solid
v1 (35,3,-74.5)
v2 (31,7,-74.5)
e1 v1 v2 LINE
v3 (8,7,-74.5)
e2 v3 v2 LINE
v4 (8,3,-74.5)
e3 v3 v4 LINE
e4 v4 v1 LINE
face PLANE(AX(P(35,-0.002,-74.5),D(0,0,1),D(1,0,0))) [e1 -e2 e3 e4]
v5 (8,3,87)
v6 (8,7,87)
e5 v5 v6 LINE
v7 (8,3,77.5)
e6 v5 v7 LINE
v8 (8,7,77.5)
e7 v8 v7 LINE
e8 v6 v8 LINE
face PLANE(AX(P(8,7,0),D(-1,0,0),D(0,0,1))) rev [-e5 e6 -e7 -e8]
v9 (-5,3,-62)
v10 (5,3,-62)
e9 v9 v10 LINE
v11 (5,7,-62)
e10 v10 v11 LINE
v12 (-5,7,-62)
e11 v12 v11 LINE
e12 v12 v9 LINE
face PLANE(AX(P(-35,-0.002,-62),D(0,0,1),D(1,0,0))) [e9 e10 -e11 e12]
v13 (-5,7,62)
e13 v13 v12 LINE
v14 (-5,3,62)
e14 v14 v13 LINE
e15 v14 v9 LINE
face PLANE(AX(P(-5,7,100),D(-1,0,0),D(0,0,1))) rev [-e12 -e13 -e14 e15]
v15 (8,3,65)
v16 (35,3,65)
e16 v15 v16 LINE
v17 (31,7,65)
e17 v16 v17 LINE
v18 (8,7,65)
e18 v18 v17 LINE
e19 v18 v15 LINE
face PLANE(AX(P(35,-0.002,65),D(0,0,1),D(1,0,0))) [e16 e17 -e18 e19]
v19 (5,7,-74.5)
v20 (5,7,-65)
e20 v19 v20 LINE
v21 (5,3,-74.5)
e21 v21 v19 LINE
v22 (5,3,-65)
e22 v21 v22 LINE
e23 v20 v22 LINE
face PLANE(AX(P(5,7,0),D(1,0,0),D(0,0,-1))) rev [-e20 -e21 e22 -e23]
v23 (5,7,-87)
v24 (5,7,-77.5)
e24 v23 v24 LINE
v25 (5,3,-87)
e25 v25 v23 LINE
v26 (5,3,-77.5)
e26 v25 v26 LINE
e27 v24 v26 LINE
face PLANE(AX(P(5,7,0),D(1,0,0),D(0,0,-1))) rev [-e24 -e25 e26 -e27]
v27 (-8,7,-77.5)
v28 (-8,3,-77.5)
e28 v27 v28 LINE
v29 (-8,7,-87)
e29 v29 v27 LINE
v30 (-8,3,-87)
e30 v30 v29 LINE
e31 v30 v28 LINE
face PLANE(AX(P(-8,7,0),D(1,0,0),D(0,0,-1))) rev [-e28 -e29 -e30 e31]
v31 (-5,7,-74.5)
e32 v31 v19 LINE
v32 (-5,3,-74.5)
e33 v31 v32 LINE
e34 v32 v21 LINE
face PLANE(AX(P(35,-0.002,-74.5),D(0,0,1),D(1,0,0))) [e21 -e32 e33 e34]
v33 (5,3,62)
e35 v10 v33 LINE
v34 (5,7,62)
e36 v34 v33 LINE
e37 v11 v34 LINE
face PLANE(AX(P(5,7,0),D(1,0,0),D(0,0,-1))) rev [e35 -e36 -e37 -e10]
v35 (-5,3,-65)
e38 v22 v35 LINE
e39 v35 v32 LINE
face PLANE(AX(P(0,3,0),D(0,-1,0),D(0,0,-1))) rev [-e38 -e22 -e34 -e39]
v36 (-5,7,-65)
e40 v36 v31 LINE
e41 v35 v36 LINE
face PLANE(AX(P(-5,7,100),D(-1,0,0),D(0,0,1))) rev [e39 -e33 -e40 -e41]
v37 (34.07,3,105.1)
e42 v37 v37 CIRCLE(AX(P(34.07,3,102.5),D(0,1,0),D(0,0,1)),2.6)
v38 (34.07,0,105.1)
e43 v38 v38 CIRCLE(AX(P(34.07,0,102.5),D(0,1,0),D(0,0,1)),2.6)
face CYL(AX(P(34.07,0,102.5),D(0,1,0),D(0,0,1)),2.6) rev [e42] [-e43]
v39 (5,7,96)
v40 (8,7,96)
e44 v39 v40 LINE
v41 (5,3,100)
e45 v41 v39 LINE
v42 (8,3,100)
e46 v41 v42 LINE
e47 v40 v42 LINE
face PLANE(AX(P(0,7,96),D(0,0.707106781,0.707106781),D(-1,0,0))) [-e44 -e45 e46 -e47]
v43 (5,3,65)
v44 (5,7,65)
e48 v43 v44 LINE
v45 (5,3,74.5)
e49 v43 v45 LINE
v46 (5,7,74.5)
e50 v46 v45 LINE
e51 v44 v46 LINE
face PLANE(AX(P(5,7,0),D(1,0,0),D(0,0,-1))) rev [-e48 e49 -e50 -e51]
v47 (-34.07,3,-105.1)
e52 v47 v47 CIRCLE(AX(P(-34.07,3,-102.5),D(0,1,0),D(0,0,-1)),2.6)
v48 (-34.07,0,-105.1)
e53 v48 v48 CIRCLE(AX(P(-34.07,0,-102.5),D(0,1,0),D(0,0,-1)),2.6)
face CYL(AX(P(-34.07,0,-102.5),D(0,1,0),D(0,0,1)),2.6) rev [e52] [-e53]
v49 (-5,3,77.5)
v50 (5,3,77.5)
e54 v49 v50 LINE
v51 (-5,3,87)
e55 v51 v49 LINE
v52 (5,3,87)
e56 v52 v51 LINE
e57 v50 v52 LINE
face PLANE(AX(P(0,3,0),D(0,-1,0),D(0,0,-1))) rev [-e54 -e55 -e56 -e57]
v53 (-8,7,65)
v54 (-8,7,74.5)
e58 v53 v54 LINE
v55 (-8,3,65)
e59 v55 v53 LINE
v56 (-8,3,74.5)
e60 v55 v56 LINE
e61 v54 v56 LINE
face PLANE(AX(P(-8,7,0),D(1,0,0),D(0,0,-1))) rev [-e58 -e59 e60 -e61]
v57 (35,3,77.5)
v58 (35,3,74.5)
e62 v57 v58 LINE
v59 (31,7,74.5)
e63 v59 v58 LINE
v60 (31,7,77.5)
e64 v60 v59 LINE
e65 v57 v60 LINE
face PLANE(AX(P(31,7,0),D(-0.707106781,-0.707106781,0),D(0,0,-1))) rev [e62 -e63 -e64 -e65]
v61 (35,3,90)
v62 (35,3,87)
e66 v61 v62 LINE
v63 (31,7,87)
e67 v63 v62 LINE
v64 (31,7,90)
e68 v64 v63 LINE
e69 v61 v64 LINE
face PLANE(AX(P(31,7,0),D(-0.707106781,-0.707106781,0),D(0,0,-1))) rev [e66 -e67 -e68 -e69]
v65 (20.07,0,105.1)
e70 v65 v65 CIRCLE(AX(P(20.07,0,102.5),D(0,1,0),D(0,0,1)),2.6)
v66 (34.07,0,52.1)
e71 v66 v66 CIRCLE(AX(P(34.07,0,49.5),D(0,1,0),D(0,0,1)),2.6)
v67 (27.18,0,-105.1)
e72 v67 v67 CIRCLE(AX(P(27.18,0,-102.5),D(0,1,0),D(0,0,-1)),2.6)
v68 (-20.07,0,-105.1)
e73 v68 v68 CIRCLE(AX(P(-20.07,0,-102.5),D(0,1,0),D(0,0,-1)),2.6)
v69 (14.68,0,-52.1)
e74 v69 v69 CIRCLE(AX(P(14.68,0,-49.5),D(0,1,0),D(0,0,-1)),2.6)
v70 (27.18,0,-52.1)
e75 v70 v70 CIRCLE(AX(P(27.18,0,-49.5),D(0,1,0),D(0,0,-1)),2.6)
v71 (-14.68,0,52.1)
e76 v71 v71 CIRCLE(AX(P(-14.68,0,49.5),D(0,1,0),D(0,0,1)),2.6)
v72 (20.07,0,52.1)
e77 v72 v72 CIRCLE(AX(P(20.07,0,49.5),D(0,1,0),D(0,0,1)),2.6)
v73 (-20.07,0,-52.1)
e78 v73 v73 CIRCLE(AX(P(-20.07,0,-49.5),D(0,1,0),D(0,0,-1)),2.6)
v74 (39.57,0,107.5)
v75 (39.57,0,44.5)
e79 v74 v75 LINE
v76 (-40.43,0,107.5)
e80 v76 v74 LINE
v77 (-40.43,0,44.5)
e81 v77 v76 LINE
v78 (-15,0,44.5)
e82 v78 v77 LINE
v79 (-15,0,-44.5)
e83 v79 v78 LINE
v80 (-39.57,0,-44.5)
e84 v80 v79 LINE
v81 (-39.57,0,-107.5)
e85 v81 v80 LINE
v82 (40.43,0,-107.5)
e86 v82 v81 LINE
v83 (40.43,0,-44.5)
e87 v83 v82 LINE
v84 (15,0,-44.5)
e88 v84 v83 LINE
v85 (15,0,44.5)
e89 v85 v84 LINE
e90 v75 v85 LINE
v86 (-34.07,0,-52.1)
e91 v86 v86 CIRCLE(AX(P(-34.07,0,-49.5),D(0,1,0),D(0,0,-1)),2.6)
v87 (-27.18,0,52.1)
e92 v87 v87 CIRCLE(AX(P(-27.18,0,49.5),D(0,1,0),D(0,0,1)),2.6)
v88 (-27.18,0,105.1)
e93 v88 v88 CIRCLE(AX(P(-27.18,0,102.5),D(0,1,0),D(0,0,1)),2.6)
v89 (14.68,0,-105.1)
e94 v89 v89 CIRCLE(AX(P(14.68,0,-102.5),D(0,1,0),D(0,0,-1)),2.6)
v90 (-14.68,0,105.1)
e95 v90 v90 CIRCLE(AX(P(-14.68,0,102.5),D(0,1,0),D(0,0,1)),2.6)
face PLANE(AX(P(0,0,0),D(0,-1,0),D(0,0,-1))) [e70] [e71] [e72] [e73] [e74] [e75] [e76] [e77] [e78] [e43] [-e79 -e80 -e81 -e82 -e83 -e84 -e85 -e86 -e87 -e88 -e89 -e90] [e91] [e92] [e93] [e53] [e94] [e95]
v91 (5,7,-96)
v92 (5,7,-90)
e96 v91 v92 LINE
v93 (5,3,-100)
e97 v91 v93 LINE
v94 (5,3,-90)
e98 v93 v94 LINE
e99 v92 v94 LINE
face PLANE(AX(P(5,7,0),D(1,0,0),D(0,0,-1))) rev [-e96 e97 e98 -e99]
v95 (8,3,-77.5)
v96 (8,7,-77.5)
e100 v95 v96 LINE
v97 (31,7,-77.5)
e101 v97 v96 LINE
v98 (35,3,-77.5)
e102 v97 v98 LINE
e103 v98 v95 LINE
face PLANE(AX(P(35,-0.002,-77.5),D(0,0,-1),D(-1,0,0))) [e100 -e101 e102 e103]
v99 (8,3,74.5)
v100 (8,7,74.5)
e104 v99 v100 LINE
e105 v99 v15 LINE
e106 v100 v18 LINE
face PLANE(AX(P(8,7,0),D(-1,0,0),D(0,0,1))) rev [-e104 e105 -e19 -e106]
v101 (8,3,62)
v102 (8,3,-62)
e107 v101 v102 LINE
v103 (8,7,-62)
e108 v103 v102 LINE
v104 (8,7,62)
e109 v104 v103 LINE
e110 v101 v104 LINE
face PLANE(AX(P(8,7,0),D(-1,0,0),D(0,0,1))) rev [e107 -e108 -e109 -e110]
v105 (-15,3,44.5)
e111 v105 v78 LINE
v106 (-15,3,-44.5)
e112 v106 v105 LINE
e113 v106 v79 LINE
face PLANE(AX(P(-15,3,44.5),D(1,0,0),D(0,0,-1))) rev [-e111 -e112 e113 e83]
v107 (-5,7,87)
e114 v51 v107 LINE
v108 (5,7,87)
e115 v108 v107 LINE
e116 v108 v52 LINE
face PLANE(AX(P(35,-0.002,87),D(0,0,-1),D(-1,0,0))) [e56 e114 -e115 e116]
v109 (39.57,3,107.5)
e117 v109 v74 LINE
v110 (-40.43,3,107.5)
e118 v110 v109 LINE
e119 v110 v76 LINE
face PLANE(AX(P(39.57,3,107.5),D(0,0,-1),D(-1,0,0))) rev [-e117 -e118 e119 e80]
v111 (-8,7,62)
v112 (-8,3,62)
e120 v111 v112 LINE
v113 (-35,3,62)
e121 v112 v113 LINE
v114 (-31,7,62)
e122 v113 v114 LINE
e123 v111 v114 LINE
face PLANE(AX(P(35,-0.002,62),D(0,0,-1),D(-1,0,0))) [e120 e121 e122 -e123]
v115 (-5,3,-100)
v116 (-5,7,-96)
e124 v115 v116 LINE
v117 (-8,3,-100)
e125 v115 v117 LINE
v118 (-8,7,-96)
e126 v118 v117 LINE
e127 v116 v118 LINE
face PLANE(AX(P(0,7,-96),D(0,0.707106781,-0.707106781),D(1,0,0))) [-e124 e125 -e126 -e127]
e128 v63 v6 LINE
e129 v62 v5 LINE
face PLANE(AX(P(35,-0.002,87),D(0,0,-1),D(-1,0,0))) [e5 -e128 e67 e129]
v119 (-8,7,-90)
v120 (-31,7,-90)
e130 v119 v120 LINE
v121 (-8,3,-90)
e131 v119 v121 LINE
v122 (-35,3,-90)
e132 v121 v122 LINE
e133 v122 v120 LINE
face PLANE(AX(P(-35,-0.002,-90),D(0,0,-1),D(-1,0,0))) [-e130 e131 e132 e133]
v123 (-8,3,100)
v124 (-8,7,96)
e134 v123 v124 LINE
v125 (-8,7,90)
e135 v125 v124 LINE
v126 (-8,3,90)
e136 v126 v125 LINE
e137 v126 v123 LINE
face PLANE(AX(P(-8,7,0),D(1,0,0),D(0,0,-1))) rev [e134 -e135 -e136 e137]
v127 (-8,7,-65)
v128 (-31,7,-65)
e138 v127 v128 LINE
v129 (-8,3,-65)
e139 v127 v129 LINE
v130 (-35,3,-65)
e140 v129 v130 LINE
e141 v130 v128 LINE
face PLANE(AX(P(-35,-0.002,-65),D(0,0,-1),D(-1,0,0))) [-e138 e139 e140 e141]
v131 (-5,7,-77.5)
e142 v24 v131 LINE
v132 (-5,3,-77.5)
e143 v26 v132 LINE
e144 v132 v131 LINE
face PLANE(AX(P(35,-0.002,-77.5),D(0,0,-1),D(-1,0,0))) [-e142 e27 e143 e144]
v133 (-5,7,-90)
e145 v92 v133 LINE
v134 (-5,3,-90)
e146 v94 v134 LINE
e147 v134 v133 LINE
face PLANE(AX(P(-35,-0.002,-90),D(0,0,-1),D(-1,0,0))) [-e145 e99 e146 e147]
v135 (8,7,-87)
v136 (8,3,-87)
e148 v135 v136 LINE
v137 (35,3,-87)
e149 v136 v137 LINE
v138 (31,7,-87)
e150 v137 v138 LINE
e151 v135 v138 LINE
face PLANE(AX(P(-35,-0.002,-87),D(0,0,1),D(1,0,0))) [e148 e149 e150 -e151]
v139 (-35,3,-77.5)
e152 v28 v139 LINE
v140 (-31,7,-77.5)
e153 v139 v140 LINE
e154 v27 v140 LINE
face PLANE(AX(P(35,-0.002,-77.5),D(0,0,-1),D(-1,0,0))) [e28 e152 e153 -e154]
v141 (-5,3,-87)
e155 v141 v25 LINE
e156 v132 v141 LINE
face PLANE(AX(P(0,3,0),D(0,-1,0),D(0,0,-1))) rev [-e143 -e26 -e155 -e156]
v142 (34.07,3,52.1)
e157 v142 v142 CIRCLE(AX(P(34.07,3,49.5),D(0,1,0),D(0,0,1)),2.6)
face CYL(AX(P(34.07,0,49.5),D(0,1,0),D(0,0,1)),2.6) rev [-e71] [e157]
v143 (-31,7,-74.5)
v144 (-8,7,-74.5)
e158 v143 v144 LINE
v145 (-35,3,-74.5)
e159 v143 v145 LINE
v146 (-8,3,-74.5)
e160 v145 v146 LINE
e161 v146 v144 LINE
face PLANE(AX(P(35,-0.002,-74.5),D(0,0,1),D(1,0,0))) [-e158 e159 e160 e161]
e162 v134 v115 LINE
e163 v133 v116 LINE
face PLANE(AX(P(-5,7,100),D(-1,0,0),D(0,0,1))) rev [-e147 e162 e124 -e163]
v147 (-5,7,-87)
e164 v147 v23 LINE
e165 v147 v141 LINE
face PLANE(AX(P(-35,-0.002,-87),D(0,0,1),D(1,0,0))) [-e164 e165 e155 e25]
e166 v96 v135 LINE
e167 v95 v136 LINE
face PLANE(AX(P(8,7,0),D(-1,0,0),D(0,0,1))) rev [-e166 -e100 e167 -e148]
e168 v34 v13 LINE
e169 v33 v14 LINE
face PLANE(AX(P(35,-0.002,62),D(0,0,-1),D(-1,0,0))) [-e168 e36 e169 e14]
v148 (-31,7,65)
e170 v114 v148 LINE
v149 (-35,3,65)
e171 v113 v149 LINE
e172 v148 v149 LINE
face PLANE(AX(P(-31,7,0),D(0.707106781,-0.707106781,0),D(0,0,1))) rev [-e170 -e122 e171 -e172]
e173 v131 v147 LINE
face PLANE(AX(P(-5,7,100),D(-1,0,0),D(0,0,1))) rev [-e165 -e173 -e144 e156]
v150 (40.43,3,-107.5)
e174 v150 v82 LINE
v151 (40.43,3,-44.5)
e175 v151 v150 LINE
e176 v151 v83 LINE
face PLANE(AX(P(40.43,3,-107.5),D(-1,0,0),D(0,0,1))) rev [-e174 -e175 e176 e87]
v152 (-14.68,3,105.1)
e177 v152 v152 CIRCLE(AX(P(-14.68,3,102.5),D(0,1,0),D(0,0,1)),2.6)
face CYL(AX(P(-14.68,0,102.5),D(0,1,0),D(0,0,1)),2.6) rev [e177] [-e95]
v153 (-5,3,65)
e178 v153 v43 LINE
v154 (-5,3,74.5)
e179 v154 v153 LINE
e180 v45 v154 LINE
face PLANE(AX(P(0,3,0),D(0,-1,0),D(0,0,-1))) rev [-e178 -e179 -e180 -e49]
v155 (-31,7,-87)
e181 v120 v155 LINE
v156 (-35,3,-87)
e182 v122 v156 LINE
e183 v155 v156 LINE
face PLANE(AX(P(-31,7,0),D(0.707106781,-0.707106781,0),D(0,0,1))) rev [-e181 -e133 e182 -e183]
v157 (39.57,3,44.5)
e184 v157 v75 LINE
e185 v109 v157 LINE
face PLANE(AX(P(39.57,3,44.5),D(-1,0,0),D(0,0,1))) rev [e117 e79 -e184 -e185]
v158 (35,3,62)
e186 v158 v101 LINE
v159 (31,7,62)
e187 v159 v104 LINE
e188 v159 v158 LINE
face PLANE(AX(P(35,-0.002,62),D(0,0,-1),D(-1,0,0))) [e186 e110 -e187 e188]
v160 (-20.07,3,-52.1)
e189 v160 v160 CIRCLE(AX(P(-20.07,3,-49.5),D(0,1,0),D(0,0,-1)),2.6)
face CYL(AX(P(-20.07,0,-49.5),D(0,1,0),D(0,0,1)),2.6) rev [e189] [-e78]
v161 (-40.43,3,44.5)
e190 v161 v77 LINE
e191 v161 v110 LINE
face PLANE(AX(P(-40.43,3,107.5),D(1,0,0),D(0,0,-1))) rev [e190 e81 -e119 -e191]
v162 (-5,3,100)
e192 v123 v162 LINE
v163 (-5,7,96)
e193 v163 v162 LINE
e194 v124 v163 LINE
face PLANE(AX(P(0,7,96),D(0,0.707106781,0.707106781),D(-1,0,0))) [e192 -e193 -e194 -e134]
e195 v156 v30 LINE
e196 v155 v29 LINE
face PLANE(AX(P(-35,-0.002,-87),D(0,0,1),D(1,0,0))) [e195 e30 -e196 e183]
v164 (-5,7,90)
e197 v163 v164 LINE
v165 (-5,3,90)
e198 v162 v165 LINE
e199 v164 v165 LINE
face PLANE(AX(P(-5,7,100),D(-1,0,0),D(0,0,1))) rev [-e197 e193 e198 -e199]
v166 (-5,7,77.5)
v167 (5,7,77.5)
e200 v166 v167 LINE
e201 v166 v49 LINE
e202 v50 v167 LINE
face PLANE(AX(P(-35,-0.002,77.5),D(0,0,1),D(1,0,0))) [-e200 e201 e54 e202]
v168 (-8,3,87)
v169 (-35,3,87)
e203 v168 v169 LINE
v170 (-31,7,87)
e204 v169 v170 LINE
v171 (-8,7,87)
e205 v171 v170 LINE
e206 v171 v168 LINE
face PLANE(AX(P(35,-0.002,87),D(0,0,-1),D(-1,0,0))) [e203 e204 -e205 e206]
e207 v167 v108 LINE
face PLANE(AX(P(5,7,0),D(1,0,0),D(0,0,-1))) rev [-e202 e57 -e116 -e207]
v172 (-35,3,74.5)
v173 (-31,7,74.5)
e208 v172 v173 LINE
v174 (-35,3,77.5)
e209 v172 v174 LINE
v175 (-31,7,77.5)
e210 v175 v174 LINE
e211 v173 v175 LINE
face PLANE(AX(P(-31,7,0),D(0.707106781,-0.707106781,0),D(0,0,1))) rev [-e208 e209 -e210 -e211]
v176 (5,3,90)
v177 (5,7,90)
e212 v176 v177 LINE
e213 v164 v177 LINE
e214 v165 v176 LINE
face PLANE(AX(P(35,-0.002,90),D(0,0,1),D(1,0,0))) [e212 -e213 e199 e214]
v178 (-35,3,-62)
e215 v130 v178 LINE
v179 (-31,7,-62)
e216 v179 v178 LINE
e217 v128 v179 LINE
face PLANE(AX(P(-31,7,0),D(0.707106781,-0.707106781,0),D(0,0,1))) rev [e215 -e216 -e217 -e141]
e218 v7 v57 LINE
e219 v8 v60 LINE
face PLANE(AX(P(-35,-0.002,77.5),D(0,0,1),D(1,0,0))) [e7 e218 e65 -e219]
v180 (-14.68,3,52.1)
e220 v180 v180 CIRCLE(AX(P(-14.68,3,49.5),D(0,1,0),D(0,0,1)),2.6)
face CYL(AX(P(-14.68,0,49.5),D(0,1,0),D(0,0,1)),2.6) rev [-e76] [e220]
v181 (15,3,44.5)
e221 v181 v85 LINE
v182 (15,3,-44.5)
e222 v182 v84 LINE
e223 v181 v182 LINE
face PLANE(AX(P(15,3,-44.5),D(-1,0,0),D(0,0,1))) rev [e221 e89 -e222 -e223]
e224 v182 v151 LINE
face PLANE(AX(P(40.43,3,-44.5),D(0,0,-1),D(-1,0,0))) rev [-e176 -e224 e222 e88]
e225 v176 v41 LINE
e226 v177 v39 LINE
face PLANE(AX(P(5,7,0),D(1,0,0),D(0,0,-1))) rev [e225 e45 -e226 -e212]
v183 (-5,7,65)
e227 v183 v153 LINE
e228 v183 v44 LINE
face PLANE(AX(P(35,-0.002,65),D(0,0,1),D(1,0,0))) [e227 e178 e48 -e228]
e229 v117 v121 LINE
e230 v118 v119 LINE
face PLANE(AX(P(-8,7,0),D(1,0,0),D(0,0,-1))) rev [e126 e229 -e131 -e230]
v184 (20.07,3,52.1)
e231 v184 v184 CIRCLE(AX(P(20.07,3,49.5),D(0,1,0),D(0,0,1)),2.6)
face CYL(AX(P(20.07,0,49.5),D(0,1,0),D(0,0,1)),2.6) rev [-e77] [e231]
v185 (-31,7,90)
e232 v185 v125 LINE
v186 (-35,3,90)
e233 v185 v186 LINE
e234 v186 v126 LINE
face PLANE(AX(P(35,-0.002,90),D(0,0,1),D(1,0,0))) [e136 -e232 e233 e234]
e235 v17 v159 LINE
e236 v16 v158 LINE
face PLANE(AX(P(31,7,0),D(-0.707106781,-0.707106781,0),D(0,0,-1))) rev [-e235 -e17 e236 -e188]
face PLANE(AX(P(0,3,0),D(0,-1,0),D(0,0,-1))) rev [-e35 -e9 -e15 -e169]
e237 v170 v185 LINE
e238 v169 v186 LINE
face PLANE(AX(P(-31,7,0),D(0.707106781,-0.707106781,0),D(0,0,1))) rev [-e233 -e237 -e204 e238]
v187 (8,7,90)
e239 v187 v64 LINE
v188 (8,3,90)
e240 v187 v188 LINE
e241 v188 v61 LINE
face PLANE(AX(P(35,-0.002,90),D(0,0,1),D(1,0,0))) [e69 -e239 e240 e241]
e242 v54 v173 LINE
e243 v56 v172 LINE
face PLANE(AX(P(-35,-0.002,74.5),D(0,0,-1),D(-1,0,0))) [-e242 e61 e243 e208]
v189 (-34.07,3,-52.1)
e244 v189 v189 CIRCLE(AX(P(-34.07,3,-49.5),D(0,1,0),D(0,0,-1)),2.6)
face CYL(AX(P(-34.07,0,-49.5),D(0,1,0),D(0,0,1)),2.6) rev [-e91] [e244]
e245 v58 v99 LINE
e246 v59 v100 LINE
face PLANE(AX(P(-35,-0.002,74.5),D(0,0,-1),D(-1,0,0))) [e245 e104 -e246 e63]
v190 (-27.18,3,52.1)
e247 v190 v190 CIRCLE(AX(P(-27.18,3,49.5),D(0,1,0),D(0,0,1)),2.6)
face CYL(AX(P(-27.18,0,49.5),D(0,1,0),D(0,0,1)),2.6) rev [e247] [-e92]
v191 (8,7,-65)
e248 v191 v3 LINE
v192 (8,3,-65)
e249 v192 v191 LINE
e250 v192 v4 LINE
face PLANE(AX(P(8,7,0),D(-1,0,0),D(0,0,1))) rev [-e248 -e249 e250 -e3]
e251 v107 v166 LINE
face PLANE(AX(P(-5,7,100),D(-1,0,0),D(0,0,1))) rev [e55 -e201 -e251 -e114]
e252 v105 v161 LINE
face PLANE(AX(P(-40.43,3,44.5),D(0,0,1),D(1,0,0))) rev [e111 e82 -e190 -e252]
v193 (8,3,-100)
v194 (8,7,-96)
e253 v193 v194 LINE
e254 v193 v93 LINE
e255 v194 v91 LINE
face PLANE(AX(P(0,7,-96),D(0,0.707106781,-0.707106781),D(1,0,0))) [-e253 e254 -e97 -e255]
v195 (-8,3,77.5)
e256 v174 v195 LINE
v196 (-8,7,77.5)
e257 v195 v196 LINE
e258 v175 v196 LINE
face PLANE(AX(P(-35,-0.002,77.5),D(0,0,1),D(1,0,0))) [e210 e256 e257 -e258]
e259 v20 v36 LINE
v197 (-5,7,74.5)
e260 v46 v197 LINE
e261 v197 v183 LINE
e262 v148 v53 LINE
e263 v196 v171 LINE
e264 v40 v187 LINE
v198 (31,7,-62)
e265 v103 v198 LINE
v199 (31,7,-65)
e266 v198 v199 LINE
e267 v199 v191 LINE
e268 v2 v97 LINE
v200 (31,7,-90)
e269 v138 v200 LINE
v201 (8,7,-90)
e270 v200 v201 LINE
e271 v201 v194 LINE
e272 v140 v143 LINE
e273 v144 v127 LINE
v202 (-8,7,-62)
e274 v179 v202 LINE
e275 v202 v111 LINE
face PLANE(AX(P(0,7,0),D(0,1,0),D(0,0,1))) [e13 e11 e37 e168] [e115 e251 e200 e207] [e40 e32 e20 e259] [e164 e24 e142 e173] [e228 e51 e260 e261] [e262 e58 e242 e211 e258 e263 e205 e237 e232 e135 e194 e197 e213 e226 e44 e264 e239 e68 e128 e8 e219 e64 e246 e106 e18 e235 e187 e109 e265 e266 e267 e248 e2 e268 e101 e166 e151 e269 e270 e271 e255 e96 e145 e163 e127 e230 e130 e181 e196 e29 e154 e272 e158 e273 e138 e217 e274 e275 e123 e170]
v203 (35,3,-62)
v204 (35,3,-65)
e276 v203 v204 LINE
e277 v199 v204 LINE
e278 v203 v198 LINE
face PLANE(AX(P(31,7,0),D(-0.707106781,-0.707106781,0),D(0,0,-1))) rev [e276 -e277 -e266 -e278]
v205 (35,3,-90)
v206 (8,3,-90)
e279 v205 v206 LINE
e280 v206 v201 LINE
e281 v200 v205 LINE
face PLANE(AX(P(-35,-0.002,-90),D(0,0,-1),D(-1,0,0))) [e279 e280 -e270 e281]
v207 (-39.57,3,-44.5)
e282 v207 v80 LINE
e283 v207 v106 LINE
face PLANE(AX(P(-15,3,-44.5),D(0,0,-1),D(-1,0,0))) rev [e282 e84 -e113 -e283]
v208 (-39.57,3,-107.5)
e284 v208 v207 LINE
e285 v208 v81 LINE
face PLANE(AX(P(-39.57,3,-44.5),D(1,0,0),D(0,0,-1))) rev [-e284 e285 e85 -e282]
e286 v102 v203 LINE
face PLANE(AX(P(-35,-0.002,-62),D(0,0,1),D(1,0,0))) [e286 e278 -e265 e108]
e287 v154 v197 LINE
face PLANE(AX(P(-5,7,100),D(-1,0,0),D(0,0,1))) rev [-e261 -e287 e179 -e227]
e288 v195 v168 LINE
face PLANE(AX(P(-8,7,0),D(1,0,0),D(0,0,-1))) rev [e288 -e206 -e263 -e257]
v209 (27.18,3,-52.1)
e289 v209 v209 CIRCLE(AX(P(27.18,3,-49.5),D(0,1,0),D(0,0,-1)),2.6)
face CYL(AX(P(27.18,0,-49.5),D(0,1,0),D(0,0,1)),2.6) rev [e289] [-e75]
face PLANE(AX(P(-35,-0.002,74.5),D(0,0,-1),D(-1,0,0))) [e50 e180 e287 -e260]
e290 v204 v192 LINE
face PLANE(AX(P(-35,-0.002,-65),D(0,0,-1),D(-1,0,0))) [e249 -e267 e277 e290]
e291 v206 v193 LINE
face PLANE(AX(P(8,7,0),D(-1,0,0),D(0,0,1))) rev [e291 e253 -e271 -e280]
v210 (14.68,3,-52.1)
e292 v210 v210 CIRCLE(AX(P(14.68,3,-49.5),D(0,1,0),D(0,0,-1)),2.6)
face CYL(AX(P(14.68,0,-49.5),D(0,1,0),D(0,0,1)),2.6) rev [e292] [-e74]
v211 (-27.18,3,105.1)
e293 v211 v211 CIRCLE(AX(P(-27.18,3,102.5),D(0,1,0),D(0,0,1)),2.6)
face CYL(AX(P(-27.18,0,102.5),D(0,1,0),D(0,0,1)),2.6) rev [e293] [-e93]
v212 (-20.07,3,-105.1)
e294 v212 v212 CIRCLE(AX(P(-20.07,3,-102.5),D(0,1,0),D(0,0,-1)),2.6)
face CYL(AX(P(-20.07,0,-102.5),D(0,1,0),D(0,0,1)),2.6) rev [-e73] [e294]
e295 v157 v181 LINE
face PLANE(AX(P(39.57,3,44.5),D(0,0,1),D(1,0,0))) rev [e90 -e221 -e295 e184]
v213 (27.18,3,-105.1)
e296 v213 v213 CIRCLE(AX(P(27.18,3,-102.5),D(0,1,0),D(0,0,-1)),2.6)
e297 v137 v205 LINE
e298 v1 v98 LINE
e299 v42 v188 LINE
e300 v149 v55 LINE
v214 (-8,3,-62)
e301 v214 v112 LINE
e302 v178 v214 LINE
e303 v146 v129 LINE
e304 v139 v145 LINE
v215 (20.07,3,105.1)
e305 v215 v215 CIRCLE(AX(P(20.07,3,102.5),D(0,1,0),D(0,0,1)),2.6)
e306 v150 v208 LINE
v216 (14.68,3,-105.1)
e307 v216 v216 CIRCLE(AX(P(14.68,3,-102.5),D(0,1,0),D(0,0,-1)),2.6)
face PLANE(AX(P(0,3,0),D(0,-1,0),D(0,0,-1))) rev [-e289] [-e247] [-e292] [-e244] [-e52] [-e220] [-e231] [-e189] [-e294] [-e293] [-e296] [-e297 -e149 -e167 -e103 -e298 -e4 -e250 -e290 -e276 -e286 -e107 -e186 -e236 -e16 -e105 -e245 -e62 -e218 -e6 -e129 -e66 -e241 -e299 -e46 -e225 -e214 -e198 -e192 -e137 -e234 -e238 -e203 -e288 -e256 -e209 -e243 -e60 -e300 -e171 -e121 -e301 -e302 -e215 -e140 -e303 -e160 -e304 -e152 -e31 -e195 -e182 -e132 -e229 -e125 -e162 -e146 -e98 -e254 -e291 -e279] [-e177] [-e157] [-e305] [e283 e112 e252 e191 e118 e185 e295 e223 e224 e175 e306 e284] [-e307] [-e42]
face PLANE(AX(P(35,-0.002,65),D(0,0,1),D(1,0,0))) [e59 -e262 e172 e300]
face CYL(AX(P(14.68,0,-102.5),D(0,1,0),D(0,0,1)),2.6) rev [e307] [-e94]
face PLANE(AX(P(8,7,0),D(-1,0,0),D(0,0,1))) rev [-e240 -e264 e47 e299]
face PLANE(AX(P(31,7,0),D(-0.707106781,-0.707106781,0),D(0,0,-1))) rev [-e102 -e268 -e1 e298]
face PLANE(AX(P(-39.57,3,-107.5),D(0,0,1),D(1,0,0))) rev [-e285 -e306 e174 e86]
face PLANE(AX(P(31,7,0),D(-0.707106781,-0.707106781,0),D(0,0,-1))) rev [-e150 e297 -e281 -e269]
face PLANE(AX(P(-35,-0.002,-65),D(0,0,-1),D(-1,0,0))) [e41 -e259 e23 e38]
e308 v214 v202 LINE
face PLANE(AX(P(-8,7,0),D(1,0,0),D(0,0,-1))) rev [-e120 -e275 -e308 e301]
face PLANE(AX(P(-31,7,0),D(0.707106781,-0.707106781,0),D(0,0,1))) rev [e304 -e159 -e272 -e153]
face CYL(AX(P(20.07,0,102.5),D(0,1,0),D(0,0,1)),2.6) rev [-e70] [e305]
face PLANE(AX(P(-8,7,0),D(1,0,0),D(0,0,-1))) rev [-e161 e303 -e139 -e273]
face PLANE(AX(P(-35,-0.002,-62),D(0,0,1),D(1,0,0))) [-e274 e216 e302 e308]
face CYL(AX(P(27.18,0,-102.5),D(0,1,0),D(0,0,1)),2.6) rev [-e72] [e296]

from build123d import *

# Parameters (mm, degrees)
BOSS_EXTRUDE1_DEPTH          = 3
SKETCH2_R                    = 2.6
CUT_EXTRUDE1_DEPTH           = 115.890534423
CIRPATTERN1_COUNT            = 2
SKETCH4_W                    = 3
SKETCH4_H                    = 100
BOSS_EXTRUDE2_DEPTH          = 4
BOSS_EXTRUDE3_START          = -4
SKETCH5_W                    = 70
SKETCH5_H                    = 3
BOSS_EXTRUDE3_DEPTH          = 4
CHAMFER2_SIZE                = 4
CIRPATTERN2_COUNT            = 2
CHAMFER2_OF_CIRPATTERN2_SIZE = 4


with BuildPart() as part:
    # Sketch1 → Boss-Extrude1 (new body)
    with BuildSketch(Plane(origin=(0, 0, 0), x_dir=(1, 0, 0), z_dir=(0, 1, 0))):
        Polygon((39.57, -44.5), (39.57, -107.5), (-40.43, -107.5), (-40.43, -44.5), (-15, -44.5), (-15, 44.5), (-39.57, 44.5), (-39.57, 107.5), (40.43, 107.5), (40.43, 44.5), (15, 44.5), (15, -44.5), align=None)
    extrude(amount=BOSS_EXTRUDE1_DEPTH)

    # Sketch2 → Cut-Extrude1 (cut, through all)
    with BuildSketch(Plane(origin=(0, 3, 0), x_dir=(1, 0, 0), z_dir=(0, 1, 0))):
        with Locations(Location((20.07, -49.5, 0), (0, 0, 270))):
            Circle(SKETCH2_R)
        with Locations(Location((34.07, -49.5, 0), (0, 0, 270))):
            Circle(SKETCH2_R)
        with Locations(Location((34.07, -102.5, 0), (0, 0, 270))):
            Circle(SKETCH2_R)
        with Locations(Location((20.07, -102.5, 0), (0, 0, 270))):
            Circle(SKETCH2_R)
        with Locations(Location((-14.68, -49.5, 0), (0, 0, 270))):
            Circle(SKETCH2_R)
        with Locations(Location((-27.18, -49.5, 0), (0, 0, 270))):
            Circle(SKETCH2_R)
        with Locations(Location((-14.68, -102.5, 0), (0, 0, 270))):
            Circle(SKETCH2_R)
        with Locations(Location((-27.18, -102.5, 0), (0, 0, 270))):
            Circle(SKETCH2_R)
    cut_extrude1 = extrude(amount=-CUT_EXTRUDE1_DEPTH, mode=Mode.SUBTRACT)

    # CirPattern1: Cut-Extrude1 ×2 about axis
    cirpattern1_axis = Axis((0, 0, 0), (0, 1, 0))
    for i in range(1, CIRPATTERN1_COUNT):
        add(cut_extrude1.rotate(cirpattern1_axis, i * 360 / CIRPATTERN1_COUNT), mode=Mode.SUBTRACT)

    # Sketch4 → Boss-Extrude2 (add)
    with BuildSketch(Plane(origin=(0, 3, 0), x_dir=(1, 0, 0), z_dir=(0, 1, 0))):
        with Locations((6.5, -50)):
            Rectangle(SKETCH4_W, SKETCH4_H)
        with Locations((-6.5, -50)):
            Rectangle(SKETCH4_W, SKETCH4_H)
    boss_extrude2 = extrude(amount=BOSS_EXTRUDE2_DEPTH)

    # Sketch5 → Boss-Extrude3 (add)
    with BuildSketch(Plane(origin=(0, 7, 0), x_dir=(1, 0, 0), z_dir=(0, 1, 0)).offset(BOSS_EXTRUDE3_START)):
        with Locations((0, -88.5)):
            Rectangle(SKETCH5_W, SKETCH5_H)
        with Locations((0, -63.5)):
            Rectangle(SKETCH5_W, SKETCH5_H)
        with Locations((0, -76)):
            Rectangle(SKETCH5_W, SKETCH5_H)
    boss_extrude3 = extrude(amount=BOSS_EXTRUDE3_DEPTH)

    # Chamfer2
    chamfer2_edges = [part.edges().sort_by_distance(p)[0] for p in [
        (35, 7, 63.5),
        (35, 7, 76),
        (35, 7, 88.5),
        (6.5, 7, 100),
        (-6.5, 7, 100),
        (-35, 7, 88.5),
        (-35, 7, 76),
        (-35, 7, 63.5),
    ]]
    chamfer(chamfer2_edges, length=CHAMFER2_SIZE - 0.0001)  # a hair under: the kernel refuses the full size

    # CirPattern2: Boss-Extrude2, Boss-Extrude3 ×2 about axis
    cirpattern2_axis = Axis((0, 0, 0), (0, 1, 0))
    add([boss_extrude2.rotate(cirpattern2_axis, i * 360 / CIRPATTERN2_COUNT) for i in range(1, CIRPATTERN2_COUNT)])
    add([boss_extrude3.rotate(cirpattern2_axis, i * 360 / CIRPATTERN2_COUNT) for i in range(1, CIRPATTERN2_COUNT)])

    # Chamfer2 of CirPattern2
    chamfer2_of_cirpattern2_edges = [part.edges().sort_by_distance(p)[0] for p in [
        (-35, 7, -63.5),
        (-35, 7, -76),
        (-35, 7, -88.5),
        (-6.5, 7, -100),
        (6.5, 7, -100),
        (35, 7, -88.5),
        (35, 7, -76),
        (35, 7, -63.5),
    ]]
    chamfer(chamfer2_of_cirpattern2_edges, length=CHAMFER2_OF_CIRPATTERN2_SIZE - 0.0001)  # a hair under: the kernel refuses the full size


solid = part.part
